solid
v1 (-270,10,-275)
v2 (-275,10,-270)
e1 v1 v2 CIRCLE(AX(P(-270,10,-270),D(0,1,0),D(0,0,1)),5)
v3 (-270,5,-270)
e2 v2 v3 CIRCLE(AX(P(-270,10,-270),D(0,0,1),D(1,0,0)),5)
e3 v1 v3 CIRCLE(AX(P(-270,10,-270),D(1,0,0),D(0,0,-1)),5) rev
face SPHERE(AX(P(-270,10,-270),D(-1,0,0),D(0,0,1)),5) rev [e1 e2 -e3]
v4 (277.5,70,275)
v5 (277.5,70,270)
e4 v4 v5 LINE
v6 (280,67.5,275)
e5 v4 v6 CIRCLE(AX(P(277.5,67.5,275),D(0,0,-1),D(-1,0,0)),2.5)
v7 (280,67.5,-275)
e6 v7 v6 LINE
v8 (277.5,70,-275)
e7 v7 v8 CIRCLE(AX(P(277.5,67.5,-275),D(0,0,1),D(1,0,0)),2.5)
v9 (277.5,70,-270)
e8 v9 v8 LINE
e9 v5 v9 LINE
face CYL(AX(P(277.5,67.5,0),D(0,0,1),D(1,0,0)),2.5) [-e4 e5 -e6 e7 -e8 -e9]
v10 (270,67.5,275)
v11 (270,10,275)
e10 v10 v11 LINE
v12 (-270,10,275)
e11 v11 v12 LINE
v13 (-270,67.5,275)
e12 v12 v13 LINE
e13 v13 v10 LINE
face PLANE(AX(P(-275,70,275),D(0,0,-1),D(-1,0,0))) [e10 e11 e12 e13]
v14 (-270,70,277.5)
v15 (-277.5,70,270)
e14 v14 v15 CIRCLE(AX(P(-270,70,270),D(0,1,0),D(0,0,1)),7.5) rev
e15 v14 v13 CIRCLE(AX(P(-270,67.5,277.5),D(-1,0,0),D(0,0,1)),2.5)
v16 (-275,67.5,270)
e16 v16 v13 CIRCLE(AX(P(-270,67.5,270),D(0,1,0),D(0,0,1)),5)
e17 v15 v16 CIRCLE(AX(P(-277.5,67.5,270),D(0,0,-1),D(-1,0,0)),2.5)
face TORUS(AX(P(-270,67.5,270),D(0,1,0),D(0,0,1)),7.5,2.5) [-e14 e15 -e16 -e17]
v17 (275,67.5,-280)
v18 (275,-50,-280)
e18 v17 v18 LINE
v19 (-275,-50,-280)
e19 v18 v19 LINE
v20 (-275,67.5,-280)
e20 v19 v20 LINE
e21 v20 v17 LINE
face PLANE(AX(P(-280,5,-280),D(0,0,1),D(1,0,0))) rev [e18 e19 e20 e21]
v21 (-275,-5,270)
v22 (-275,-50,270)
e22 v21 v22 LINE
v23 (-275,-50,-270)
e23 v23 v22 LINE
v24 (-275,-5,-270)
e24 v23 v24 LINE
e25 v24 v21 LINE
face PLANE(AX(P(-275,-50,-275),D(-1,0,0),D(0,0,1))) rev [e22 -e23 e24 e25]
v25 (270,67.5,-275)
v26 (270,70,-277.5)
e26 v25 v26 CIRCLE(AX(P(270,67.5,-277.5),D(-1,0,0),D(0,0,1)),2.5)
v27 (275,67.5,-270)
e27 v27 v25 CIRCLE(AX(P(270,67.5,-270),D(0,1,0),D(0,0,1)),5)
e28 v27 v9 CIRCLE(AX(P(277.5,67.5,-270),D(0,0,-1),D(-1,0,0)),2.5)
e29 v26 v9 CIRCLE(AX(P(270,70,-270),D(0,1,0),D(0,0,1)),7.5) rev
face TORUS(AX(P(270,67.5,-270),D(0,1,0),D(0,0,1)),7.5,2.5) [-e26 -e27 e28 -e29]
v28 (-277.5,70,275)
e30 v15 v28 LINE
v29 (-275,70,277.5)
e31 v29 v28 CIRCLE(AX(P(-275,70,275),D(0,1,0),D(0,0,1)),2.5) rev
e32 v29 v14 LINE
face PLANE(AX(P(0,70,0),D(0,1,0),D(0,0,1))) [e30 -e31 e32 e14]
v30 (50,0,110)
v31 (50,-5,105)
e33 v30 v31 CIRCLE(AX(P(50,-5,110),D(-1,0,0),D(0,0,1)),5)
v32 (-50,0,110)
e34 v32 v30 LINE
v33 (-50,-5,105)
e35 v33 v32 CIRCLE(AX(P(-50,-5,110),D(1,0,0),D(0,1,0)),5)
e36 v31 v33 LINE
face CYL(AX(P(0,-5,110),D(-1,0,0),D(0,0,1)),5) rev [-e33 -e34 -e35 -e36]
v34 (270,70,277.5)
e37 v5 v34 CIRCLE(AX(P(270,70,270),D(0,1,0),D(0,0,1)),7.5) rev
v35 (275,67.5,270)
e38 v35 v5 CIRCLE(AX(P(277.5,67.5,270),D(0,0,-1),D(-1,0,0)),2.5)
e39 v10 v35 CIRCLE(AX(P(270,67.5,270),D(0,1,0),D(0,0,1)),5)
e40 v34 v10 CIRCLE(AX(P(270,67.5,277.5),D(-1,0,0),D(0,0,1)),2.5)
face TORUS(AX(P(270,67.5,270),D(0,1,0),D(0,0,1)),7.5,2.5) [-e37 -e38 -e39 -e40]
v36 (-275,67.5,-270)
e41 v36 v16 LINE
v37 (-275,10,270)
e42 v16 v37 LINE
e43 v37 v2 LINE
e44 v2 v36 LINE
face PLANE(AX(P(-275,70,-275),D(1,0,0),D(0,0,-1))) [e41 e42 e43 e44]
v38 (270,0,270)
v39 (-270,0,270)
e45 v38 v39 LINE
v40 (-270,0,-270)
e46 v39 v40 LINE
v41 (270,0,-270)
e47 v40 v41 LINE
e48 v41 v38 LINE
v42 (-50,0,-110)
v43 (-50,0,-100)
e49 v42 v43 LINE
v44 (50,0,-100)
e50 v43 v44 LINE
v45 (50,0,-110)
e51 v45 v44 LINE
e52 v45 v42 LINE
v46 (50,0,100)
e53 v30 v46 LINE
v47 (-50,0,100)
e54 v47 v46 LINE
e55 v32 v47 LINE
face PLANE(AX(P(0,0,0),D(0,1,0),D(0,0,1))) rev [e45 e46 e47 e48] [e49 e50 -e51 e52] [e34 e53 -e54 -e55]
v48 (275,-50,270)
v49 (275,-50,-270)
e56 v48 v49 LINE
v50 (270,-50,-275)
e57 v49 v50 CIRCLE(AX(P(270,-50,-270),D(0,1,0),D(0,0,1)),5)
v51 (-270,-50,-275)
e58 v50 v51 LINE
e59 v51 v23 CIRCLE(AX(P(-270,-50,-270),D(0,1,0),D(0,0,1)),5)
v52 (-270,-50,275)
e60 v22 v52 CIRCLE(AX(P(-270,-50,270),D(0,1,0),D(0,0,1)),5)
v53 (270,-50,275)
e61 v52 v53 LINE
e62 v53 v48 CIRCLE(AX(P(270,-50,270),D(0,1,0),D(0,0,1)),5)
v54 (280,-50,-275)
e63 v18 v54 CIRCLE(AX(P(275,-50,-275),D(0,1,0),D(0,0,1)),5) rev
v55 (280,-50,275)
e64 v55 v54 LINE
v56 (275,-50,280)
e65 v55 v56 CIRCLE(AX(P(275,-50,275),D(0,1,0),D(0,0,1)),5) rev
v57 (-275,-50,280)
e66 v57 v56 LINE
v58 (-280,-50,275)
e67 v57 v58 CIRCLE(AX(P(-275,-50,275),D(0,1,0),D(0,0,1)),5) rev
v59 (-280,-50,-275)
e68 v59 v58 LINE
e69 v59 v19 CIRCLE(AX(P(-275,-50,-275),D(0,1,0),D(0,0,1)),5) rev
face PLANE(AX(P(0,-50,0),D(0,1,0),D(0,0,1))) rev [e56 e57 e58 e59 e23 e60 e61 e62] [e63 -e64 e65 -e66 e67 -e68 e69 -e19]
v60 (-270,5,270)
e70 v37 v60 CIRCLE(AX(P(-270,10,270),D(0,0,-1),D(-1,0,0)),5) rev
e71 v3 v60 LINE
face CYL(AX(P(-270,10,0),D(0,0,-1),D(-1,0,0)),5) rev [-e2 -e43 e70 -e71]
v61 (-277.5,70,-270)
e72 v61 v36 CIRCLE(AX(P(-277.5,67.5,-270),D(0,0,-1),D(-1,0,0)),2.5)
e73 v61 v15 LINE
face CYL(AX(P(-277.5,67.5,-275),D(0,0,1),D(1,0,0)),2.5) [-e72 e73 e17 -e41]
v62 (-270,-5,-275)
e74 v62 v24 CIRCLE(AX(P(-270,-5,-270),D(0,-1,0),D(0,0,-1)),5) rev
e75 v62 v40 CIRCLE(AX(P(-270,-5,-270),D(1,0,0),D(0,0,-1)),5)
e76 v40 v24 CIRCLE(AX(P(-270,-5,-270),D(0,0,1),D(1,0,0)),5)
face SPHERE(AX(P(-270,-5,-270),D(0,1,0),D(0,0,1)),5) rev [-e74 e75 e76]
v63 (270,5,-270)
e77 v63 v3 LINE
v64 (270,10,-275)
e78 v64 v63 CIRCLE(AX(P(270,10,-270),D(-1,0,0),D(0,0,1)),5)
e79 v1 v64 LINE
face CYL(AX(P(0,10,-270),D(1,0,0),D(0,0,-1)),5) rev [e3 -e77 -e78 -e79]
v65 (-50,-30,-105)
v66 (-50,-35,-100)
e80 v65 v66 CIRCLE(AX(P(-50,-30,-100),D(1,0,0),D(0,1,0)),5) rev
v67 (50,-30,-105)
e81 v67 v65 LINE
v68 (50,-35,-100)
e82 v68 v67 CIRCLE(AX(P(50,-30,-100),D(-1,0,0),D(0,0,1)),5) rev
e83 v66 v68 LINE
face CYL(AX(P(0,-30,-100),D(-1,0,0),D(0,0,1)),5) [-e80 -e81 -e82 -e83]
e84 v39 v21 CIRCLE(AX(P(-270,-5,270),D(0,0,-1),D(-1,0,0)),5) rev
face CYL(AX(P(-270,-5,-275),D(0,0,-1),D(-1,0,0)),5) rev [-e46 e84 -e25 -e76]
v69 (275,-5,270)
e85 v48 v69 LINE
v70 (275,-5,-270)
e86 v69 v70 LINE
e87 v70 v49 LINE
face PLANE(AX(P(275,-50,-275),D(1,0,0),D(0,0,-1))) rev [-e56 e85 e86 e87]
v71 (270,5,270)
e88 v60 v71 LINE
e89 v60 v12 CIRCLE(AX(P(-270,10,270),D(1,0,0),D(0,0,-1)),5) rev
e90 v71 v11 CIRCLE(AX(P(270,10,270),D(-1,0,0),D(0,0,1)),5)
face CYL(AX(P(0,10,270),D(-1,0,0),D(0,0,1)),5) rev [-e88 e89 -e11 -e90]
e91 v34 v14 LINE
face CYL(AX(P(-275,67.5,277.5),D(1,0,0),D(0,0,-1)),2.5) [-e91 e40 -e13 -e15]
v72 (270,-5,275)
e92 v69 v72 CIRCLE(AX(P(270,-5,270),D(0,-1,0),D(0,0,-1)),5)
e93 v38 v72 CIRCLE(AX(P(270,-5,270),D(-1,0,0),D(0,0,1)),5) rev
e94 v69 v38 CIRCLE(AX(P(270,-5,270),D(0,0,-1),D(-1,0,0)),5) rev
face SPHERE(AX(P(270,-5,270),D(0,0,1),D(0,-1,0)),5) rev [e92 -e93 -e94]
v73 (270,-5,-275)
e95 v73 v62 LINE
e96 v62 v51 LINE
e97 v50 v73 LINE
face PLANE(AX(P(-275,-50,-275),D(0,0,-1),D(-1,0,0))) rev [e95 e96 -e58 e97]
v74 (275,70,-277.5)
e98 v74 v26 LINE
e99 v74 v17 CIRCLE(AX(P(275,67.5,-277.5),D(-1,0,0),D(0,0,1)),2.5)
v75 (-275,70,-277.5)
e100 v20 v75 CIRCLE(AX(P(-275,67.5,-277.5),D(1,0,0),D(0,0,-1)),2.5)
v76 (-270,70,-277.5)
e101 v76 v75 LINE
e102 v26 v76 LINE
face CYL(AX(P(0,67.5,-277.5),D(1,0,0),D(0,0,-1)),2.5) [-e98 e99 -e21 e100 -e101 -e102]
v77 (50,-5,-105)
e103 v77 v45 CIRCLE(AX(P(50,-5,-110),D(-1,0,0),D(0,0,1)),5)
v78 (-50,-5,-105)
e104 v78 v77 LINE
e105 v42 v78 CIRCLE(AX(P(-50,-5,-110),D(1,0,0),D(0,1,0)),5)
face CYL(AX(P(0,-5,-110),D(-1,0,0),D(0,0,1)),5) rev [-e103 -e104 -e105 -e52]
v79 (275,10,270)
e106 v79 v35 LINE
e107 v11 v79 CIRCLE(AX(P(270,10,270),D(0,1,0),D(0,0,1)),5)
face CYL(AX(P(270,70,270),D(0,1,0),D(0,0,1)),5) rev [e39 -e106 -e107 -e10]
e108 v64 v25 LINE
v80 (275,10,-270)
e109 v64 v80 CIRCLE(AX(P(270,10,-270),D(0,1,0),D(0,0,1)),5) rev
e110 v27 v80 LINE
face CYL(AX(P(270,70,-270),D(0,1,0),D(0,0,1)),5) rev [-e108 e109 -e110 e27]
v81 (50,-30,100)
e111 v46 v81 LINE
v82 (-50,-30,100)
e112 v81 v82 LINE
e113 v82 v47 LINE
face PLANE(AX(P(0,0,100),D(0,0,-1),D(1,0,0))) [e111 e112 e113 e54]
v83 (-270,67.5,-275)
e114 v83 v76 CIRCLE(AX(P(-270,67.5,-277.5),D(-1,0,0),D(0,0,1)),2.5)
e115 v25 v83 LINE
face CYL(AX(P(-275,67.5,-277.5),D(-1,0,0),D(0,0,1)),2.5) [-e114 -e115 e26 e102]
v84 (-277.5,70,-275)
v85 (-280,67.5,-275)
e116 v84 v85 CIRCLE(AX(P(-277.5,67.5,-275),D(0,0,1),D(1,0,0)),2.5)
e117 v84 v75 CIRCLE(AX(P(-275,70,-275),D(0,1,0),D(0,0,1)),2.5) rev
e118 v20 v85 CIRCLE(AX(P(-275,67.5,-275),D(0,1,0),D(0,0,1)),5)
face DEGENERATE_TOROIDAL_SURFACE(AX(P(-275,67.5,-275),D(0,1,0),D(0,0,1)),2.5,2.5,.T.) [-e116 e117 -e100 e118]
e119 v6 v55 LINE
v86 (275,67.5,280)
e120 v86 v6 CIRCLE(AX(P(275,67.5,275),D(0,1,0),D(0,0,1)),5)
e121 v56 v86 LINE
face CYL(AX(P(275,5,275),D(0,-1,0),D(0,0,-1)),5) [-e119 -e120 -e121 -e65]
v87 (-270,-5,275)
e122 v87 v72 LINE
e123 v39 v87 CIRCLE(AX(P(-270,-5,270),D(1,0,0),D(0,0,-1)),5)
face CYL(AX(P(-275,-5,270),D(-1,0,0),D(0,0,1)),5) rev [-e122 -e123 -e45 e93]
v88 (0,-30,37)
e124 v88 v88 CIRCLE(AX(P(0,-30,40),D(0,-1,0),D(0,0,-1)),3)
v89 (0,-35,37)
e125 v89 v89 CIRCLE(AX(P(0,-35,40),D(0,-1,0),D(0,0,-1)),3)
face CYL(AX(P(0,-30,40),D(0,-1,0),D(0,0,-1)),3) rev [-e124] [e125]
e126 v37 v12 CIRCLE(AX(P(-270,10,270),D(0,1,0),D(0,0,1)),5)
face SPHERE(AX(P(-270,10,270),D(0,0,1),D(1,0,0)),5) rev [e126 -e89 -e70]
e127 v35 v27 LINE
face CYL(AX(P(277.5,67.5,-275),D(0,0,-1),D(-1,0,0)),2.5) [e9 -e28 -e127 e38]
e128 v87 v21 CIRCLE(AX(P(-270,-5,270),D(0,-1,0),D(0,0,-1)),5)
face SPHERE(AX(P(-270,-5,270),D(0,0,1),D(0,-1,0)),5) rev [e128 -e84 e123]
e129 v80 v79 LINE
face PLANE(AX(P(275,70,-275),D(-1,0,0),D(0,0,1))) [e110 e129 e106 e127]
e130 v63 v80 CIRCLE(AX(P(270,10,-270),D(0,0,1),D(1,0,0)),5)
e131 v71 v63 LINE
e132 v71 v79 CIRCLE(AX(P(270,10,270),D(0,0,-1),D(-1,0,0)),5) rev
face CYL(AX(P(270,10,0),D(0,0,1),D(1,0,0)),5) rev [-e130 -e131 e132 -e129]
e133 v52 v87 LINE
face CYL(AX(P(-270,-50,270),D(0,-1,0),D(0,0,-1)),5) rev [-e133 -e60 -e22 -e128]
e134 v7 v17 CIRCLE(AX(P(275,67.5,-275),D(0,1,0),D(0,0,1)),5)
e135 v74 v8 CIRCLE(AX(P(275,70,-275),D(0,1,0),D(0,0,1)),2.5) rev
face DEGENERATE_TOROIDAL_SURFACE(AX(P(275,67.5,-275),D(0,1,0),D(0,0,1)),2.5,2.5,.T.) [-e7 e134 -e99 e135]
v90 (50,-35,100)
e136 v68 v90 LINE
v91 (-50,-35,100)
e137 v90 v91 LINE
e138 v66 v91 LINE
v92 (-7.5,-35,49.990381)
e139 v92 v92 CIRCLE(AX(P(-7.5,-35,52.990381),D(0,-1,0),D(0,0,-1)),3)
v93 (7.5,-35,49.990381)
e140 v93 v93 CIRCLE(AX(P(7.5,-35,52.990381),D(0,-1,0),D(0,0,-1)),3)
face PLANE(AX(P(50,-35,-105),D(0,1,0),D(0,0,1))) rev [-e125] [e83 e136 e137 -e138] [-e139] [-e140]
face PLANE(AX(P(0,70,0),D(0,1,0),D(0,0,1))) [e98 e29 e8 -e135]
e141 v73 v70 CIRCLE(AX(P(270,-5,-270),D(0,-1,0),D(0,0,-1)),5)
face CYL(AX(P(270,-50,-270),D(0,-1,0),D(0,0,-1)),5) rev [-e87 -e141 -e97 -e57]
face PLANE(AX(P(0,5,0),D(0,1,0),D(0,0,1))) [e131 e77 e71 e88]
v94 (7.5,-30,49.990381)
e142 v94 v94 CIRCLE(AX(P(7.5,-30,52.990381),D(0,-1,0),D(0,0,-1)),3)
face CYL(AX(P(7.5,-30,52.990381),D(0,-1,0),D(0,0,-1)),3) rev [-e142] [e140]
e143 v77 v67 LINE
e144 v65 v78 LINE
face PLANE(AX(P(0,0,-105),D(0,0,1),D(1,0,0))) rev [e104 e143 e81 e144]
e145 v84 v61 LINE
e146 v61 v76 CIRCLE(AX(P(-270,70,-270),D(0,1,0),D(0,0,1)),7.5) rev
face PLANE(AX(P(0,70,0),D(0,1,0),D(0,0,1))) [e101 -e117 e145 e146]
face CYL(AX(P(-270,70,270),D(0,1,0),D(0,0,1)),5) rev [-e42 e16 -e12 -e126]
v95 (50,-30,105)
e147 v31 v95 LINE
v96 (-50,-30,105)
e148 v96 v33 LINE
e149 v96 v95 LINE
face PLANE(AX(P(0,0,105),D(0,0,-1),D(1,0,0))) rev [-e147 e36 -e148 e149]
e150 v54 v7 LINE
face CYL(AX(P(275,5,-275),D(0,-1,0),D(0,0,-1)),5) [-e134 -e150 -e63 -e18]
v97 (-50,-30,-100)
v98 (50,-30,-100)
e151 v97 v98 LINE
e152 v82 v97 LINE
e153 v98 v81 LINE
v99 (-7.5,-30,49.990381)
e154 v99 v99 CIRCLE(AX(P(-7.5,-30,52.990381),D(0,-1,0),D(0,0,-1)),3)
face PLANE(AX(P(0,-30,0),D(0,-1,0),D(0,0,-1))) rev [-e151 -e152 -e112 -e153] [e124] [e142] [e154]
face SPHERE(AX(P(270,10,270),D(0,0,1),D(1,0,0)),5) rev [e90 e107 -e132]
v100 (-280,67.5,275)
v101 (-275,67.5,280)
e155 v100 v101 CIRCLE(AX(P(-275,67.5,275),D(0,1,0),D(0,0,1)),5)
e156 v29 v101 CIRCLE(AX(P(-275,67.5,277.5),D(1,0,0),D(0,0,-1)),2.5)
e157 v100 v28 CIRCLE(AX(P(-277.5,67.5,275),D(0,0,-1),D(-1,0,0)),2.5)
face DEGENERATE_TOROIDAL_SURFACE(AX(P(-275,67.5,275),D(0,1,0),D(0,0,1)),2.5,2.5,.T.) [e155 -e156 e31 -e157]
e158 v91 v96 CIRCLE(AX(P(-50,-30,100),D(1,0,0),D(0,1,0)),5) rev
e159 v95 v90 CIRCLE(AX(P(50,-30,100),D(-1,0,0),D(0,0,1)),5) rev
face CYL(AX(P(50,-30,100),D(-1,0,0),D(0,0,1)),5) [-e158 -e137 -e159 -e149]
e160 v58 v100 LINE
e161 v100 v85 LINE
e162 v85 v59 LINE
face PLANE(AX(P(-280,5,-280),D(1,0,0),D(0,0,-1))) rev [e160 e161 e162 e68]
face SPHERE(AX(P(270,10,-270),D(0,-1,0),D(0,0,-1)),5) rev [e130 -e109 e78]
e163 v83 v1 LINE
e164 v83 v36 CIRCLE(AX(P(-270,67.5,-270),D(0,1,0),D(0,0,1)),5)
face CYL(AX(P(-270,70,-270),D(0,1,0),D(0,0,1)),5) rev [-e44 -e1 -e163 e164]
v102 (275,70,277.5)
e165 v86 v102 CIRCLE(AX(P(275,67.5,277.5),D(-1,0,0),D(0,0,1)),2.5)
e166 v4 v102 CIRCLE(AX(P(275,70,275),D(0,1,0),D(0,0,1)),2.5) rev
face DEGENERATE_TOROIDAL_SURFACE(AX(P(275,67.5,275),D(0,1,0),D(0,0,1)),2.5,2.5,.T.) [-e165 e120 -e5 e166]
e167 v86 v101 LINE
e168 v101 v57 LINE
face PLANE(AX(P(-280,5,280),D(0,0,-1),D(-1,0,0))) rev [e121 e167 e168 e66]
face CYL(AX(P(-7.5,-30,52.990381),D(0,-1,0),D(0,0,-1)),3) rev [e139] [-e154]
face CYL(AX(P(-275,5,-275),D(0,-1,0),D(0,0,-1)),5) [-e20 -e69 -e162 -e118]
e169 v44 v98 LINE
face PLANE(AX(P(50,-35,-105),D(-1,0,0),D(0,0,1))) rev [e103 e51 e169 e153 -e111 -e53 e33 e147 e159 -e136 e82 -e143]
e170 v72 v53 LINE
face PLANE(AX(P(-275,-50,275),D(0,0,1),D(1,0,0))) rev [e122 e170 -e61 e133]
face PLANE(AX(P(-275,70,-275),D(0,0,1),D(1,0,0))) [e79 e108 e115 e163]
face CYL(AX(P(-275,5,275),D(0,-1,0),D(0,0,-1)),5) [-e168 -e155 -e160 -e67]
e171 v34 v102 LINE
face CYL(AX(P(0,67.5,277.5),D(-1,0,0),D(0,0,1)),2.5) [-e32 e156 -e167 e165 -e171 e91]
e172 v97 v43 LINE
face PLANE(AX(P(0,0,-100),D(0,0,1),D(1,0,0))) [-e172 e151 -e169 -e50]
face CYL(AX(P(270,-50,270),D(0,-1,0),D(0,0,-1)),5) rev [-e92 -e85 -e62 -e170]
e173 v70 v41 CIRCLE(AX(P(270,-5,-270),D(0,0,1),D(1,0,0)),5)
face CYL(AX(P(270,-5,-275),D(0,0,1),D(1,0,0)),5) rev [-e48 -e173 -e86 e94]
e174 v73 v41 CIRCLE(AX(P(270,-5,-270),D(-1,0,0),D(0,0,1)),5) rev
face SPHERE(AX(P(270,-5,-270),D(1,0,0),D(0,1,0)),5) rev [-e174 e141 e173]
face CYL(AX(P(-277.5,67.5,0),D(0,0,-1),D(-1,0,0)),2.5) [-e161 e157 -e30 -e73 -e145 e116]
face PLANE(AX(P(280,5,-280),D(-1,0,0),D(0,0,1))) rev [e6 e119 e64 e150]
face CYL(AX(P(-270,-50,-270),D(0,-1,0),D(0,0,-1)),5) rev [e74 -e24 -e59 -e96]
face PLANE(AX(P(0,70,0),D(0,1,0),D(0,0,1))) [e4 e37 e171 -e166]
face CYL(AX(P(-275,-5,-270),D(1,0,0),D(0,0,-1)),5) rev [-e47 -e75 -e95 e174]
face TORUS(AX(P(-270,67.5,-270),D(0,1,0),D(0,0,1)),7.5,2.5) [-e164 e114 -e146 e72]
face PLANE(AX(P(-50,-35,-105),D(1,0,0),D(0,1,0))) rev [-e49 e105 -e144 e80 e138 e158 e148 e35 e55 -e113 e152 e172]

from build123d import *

# Parameters (mm, degrees)
SKETCH1_W           = 560
SKETCH1_H           = 560
BOSS_EXTRUDE1_DEPTH = 5
SKETCH2_W           = 560
SKETCH2_H           = 560
SKETCH2_W_2         = 550
SKETCH2_H_2         = 550
BOSS_EXTRUDE2_DEPTH = 65
BOSS_EXTRUDE3_START = -5
SKETCH2_2_W         = 560
SKETCH2_2_H         = 560
SKETCH2_2_W_2       = 550
SKETCH2_2_H_2       = 550
BOSS_EXTRUDE3_DEPTH = 50
SKETCH7_W           = 100
SKETCH7_H           = 200
BOSS_EXTRUDE5_DEPTH = 5
SKETCH8_W           = 100
SKETCH8_H           = 35
BOSS_EXTRUDE6_DEPTH = 5
SKETCH9_R           = 3
CUT_EXTRUDE1_DEPTH  = 5
FILLET1_R           = 5
FILLET2_R           = 2.5
FILLET3_R           = 5


# Some blends are built 0.0001 mm under size
with BuildPart() as part:
    # Sketch1 → Boss-Extrude1 (new body)
    with BuildSketch(Plane(origin=(0, 0, 0), x_dir=(1, 0, 0), z_dir=(0, 1, 0))):
        Rectangle(SKETCH1_W, SKETCH1_H)
    extrude(amount=BOSS_EXTRUDE1_DEPTH)

    # Sketch2 → Boss-Extrude2 (add)
    with BuildSketch(Plane(origin=(0, 5, 0), x_dir=(1, 0, 0), z_dir=(0, 1, 0))):
        Rectangle(SKETCH2_W, SKETCH2_H)
        Rectangle(SKETCH2_W_2, SKETCH2_H_2, mode=Mode.SUBTRACT)
    extrude(amount=BOSS_EXTRUDE2_DEPTH)

    # Sketch2<2> → Boss-Extrude3 (add)
    with BuildSketch(Plane(origin=(0, 5, 0), x_dir=(1, 0, 0), z_dir=(0, 1, 0)).offset(BOSS_EXTRUDE3_START)):
        Rectangle(SKETCH2_2_W, SKETCH2_2_H)
        Rectangle(SKETCH2_2_W_2, SKETCH2_2_H_2, mode=Mode.SUBTRACT)
    extrude(amount=-BOSS_EXTRUDE3_DEPTH)



with BuildPart() as body_2:
    # Sketch7 → Boss-Extrude5 (new body)
    with BuildSketch(Plane(origin=(0, -30, 0), x_dir=(-1, 0, 0), z_dir=(0, -1, 0))):
        Rectangle(SKETCH7_W, SKETCH7_H)
    extrude(amount=BOSS_EXTRUDE5_DEPTH)


with BuildPart() as part_1:
    add(part.part)

    add(body_2.part)  # Boss-Extrude6 merges body 2
    # Sketch8 → Boss-Extrude6 (add)
    with BuildSketch(Plane(origin=(0, 0, -100), x_dir=(-1, 0, 0), z_dir=(0, 0, -1))):
        with Locations((0, -17.5)):
            Rectangle(SKETCH8_W, SKETCH8_H)
    boss_extrude6 = extrude(amount=BOSS_EXTRUDE6_DEPTH)

    # Mirror1: Boss-Extrude6 across plane
    add(boss_extrude6.mirror(Plane(origin=(0, 0, 0), x_dir=(1, 0, 0), z_dir=(0, 0, -1))))

    # Sketch9 → Cut-Extrude1 (cut)
    with BuildSketch(Plane.XZ.offset(35)):
        with Locations(Location((7.5, 52.990381057, 0), (0, 0, 270))):
            Circle(SKETCH9_R)
        with Locations(Location((0, 40, 0), (0, 0, 270))):
            Circle(SKETCH9_R)
        with Locations(Location((-7.5, 52.990381057, 0), (0, 0, 270))):
            Circle(SKETCH9_R)
    extrude(amount=-CUT_EXTRUDE1_DEPTH, mode=Mode.SUBTRACT)

    # Fillet1
    fillet1_edges = [part_1.edges().sort_by_distance(p)[0] for p in [
        (275, 5, 0),
        (0, 5, -275),
        (-275, 5, 0),
        (0, 5, 275),
        (275, 37.5, -275),
        (-275, 37.5, -275),
        (-275, 37.5, 275),
        (275, 37.5, 275),
        (275, 0, 0),
        (275, -25, 275),
        (0, 0, 275),
        (-275, -25, 275),
        (-275, 0, 0),
        (-275, -25, -275),
        (0, 0, -275),
        (275, -25, -275),
        (0, -35, -105),
        (0, 0, -105),
        (0, 0, 105),
        (0, -35, 105),
    ]]
    fillet(fillet1_edges, radius=FILLET1_R)

    # Fillet2
    fillet2_edges = [part_1.edges().sort_by_distance(p)[0] for p in [
        (275, 70, 0),
        (0, 70, -275),
        (0, 70, 275),
        (-275, 70, 0),
        (273.535533906, 70, -273.535533906),
        (273.535533906, 70, 273.535533906),
        (-273.535533906, 70, 273.535533906),
        (-273.535533906, 70, -273.535533906),
        (0, 70, 280),
        (280, 70, 0),
        (0, 70, -280),
        (-280, 70, 0),
    ]]
    fillet(fillet2_edges, radius=FILLET2_R - 0.0001)  # a hair under: the kernel refuses the full size

    # Fillet3
    # the kernel refuses this fillet: 5 mm, written as the material it takes off along each edge
    with BuildSketch(Plane(origin=(275, 70, 275), x_dir=(0, 0, 1), z_dir=(-1, 0, 0))) as fillet3_piece_1:
        with BuildLine():
            CenterArc((2.5001, -2.4999), 2.4999, 0, 90)
            Line((5, -2.4999), (5, 0))
            Line((5, 0), (2.5001, 0))
        make_face()
    revolve(axis=Axis((275, 70, 275), (0, 1, 0)), revolution_arc=90, mode=Mode.SUBTRACT)
    with BuildSketch(Plane(origin=(-275, 70, 275), x_dir=(-1, 0, 0), z_dir=(0, 0, -1))) as fillet3_piece_2:
        with BuildLine():
            CenterArc((2.5001, -2.4999), 2.4999, 0, 90)
            Line((5, -2.4999), (5, 0))
            Line((5, 0), (2.5001, 0))
        make_face()
    revolve(axis=Axis((-275, 70, 275), (0, 1, 0)), revolution_arc=90, mode=Mode.SUBTRACT)
    with BuildSketch(Plane(origin=(-275, 70, -275), x_dir=(0, 0, -1), z_dir=(1, 0, 0))) as fillet3_piece_3:
        with BuildLine():
            CenterArc((2.5001, -2.4999), 2.4999, 0, 90)
            Line((5, -2.4999), (5, 0))
            Line((5, 0), (2.5001, 0))
        make_face()
    revolve(axis=Axis((-275, 70, -275), (0, 1, 0)), revolution_arc=90, mode=Mode.SUBTRACT)
    with BuildSketch(Plane(origin=(275, 70, -275), x_dir=(1, 0, 0), z_dir=(0, 0, 1))) as fillet3_piece_4:
        with BuildLine():
            CenterArc((2.5001, -2.4999), 2.4999, 0, 90)
            Line((5, -2.4999), (5, 0))
            Line((5, 0), (2.5001, 0))
        make_face()
    revolve(axis=Axis((275, 70, -275), (0, 1, 0)), revolution_arc=90, mode=Mode.SUBTRACT)
    with BuildSketch(Plane(origin=(-280, -62.5, -280), x_dir=(0, 0, 1), z_dir=(0, 1, 0)), Plane(origin=(-280, -62.5, 280), x_dir=(1, 0, 0), z_dir=(0, 1, 0)), Plane(origin=(280, 70, -280), x_dir=(0, 0, 1), z_dir=(0, -1, 0)), Plane(origin=(280, 70, 280), x_dir=(-1, 0, 0), z_dir=(0, -1, 0))) as fillet3_piece_5:
        with BuildLine():
            CenterArc((FILLET3_R, FILLET3_R), FILLET3_R, 180, 90)
            Line((0, FILLET3_R), (0, 0))
            Line((0, 0), (FILLET3_R, 0))
        make_face()
    extrude(amount=132.5, mode=Mode.SUBTRACT)


solid = part_1.part
